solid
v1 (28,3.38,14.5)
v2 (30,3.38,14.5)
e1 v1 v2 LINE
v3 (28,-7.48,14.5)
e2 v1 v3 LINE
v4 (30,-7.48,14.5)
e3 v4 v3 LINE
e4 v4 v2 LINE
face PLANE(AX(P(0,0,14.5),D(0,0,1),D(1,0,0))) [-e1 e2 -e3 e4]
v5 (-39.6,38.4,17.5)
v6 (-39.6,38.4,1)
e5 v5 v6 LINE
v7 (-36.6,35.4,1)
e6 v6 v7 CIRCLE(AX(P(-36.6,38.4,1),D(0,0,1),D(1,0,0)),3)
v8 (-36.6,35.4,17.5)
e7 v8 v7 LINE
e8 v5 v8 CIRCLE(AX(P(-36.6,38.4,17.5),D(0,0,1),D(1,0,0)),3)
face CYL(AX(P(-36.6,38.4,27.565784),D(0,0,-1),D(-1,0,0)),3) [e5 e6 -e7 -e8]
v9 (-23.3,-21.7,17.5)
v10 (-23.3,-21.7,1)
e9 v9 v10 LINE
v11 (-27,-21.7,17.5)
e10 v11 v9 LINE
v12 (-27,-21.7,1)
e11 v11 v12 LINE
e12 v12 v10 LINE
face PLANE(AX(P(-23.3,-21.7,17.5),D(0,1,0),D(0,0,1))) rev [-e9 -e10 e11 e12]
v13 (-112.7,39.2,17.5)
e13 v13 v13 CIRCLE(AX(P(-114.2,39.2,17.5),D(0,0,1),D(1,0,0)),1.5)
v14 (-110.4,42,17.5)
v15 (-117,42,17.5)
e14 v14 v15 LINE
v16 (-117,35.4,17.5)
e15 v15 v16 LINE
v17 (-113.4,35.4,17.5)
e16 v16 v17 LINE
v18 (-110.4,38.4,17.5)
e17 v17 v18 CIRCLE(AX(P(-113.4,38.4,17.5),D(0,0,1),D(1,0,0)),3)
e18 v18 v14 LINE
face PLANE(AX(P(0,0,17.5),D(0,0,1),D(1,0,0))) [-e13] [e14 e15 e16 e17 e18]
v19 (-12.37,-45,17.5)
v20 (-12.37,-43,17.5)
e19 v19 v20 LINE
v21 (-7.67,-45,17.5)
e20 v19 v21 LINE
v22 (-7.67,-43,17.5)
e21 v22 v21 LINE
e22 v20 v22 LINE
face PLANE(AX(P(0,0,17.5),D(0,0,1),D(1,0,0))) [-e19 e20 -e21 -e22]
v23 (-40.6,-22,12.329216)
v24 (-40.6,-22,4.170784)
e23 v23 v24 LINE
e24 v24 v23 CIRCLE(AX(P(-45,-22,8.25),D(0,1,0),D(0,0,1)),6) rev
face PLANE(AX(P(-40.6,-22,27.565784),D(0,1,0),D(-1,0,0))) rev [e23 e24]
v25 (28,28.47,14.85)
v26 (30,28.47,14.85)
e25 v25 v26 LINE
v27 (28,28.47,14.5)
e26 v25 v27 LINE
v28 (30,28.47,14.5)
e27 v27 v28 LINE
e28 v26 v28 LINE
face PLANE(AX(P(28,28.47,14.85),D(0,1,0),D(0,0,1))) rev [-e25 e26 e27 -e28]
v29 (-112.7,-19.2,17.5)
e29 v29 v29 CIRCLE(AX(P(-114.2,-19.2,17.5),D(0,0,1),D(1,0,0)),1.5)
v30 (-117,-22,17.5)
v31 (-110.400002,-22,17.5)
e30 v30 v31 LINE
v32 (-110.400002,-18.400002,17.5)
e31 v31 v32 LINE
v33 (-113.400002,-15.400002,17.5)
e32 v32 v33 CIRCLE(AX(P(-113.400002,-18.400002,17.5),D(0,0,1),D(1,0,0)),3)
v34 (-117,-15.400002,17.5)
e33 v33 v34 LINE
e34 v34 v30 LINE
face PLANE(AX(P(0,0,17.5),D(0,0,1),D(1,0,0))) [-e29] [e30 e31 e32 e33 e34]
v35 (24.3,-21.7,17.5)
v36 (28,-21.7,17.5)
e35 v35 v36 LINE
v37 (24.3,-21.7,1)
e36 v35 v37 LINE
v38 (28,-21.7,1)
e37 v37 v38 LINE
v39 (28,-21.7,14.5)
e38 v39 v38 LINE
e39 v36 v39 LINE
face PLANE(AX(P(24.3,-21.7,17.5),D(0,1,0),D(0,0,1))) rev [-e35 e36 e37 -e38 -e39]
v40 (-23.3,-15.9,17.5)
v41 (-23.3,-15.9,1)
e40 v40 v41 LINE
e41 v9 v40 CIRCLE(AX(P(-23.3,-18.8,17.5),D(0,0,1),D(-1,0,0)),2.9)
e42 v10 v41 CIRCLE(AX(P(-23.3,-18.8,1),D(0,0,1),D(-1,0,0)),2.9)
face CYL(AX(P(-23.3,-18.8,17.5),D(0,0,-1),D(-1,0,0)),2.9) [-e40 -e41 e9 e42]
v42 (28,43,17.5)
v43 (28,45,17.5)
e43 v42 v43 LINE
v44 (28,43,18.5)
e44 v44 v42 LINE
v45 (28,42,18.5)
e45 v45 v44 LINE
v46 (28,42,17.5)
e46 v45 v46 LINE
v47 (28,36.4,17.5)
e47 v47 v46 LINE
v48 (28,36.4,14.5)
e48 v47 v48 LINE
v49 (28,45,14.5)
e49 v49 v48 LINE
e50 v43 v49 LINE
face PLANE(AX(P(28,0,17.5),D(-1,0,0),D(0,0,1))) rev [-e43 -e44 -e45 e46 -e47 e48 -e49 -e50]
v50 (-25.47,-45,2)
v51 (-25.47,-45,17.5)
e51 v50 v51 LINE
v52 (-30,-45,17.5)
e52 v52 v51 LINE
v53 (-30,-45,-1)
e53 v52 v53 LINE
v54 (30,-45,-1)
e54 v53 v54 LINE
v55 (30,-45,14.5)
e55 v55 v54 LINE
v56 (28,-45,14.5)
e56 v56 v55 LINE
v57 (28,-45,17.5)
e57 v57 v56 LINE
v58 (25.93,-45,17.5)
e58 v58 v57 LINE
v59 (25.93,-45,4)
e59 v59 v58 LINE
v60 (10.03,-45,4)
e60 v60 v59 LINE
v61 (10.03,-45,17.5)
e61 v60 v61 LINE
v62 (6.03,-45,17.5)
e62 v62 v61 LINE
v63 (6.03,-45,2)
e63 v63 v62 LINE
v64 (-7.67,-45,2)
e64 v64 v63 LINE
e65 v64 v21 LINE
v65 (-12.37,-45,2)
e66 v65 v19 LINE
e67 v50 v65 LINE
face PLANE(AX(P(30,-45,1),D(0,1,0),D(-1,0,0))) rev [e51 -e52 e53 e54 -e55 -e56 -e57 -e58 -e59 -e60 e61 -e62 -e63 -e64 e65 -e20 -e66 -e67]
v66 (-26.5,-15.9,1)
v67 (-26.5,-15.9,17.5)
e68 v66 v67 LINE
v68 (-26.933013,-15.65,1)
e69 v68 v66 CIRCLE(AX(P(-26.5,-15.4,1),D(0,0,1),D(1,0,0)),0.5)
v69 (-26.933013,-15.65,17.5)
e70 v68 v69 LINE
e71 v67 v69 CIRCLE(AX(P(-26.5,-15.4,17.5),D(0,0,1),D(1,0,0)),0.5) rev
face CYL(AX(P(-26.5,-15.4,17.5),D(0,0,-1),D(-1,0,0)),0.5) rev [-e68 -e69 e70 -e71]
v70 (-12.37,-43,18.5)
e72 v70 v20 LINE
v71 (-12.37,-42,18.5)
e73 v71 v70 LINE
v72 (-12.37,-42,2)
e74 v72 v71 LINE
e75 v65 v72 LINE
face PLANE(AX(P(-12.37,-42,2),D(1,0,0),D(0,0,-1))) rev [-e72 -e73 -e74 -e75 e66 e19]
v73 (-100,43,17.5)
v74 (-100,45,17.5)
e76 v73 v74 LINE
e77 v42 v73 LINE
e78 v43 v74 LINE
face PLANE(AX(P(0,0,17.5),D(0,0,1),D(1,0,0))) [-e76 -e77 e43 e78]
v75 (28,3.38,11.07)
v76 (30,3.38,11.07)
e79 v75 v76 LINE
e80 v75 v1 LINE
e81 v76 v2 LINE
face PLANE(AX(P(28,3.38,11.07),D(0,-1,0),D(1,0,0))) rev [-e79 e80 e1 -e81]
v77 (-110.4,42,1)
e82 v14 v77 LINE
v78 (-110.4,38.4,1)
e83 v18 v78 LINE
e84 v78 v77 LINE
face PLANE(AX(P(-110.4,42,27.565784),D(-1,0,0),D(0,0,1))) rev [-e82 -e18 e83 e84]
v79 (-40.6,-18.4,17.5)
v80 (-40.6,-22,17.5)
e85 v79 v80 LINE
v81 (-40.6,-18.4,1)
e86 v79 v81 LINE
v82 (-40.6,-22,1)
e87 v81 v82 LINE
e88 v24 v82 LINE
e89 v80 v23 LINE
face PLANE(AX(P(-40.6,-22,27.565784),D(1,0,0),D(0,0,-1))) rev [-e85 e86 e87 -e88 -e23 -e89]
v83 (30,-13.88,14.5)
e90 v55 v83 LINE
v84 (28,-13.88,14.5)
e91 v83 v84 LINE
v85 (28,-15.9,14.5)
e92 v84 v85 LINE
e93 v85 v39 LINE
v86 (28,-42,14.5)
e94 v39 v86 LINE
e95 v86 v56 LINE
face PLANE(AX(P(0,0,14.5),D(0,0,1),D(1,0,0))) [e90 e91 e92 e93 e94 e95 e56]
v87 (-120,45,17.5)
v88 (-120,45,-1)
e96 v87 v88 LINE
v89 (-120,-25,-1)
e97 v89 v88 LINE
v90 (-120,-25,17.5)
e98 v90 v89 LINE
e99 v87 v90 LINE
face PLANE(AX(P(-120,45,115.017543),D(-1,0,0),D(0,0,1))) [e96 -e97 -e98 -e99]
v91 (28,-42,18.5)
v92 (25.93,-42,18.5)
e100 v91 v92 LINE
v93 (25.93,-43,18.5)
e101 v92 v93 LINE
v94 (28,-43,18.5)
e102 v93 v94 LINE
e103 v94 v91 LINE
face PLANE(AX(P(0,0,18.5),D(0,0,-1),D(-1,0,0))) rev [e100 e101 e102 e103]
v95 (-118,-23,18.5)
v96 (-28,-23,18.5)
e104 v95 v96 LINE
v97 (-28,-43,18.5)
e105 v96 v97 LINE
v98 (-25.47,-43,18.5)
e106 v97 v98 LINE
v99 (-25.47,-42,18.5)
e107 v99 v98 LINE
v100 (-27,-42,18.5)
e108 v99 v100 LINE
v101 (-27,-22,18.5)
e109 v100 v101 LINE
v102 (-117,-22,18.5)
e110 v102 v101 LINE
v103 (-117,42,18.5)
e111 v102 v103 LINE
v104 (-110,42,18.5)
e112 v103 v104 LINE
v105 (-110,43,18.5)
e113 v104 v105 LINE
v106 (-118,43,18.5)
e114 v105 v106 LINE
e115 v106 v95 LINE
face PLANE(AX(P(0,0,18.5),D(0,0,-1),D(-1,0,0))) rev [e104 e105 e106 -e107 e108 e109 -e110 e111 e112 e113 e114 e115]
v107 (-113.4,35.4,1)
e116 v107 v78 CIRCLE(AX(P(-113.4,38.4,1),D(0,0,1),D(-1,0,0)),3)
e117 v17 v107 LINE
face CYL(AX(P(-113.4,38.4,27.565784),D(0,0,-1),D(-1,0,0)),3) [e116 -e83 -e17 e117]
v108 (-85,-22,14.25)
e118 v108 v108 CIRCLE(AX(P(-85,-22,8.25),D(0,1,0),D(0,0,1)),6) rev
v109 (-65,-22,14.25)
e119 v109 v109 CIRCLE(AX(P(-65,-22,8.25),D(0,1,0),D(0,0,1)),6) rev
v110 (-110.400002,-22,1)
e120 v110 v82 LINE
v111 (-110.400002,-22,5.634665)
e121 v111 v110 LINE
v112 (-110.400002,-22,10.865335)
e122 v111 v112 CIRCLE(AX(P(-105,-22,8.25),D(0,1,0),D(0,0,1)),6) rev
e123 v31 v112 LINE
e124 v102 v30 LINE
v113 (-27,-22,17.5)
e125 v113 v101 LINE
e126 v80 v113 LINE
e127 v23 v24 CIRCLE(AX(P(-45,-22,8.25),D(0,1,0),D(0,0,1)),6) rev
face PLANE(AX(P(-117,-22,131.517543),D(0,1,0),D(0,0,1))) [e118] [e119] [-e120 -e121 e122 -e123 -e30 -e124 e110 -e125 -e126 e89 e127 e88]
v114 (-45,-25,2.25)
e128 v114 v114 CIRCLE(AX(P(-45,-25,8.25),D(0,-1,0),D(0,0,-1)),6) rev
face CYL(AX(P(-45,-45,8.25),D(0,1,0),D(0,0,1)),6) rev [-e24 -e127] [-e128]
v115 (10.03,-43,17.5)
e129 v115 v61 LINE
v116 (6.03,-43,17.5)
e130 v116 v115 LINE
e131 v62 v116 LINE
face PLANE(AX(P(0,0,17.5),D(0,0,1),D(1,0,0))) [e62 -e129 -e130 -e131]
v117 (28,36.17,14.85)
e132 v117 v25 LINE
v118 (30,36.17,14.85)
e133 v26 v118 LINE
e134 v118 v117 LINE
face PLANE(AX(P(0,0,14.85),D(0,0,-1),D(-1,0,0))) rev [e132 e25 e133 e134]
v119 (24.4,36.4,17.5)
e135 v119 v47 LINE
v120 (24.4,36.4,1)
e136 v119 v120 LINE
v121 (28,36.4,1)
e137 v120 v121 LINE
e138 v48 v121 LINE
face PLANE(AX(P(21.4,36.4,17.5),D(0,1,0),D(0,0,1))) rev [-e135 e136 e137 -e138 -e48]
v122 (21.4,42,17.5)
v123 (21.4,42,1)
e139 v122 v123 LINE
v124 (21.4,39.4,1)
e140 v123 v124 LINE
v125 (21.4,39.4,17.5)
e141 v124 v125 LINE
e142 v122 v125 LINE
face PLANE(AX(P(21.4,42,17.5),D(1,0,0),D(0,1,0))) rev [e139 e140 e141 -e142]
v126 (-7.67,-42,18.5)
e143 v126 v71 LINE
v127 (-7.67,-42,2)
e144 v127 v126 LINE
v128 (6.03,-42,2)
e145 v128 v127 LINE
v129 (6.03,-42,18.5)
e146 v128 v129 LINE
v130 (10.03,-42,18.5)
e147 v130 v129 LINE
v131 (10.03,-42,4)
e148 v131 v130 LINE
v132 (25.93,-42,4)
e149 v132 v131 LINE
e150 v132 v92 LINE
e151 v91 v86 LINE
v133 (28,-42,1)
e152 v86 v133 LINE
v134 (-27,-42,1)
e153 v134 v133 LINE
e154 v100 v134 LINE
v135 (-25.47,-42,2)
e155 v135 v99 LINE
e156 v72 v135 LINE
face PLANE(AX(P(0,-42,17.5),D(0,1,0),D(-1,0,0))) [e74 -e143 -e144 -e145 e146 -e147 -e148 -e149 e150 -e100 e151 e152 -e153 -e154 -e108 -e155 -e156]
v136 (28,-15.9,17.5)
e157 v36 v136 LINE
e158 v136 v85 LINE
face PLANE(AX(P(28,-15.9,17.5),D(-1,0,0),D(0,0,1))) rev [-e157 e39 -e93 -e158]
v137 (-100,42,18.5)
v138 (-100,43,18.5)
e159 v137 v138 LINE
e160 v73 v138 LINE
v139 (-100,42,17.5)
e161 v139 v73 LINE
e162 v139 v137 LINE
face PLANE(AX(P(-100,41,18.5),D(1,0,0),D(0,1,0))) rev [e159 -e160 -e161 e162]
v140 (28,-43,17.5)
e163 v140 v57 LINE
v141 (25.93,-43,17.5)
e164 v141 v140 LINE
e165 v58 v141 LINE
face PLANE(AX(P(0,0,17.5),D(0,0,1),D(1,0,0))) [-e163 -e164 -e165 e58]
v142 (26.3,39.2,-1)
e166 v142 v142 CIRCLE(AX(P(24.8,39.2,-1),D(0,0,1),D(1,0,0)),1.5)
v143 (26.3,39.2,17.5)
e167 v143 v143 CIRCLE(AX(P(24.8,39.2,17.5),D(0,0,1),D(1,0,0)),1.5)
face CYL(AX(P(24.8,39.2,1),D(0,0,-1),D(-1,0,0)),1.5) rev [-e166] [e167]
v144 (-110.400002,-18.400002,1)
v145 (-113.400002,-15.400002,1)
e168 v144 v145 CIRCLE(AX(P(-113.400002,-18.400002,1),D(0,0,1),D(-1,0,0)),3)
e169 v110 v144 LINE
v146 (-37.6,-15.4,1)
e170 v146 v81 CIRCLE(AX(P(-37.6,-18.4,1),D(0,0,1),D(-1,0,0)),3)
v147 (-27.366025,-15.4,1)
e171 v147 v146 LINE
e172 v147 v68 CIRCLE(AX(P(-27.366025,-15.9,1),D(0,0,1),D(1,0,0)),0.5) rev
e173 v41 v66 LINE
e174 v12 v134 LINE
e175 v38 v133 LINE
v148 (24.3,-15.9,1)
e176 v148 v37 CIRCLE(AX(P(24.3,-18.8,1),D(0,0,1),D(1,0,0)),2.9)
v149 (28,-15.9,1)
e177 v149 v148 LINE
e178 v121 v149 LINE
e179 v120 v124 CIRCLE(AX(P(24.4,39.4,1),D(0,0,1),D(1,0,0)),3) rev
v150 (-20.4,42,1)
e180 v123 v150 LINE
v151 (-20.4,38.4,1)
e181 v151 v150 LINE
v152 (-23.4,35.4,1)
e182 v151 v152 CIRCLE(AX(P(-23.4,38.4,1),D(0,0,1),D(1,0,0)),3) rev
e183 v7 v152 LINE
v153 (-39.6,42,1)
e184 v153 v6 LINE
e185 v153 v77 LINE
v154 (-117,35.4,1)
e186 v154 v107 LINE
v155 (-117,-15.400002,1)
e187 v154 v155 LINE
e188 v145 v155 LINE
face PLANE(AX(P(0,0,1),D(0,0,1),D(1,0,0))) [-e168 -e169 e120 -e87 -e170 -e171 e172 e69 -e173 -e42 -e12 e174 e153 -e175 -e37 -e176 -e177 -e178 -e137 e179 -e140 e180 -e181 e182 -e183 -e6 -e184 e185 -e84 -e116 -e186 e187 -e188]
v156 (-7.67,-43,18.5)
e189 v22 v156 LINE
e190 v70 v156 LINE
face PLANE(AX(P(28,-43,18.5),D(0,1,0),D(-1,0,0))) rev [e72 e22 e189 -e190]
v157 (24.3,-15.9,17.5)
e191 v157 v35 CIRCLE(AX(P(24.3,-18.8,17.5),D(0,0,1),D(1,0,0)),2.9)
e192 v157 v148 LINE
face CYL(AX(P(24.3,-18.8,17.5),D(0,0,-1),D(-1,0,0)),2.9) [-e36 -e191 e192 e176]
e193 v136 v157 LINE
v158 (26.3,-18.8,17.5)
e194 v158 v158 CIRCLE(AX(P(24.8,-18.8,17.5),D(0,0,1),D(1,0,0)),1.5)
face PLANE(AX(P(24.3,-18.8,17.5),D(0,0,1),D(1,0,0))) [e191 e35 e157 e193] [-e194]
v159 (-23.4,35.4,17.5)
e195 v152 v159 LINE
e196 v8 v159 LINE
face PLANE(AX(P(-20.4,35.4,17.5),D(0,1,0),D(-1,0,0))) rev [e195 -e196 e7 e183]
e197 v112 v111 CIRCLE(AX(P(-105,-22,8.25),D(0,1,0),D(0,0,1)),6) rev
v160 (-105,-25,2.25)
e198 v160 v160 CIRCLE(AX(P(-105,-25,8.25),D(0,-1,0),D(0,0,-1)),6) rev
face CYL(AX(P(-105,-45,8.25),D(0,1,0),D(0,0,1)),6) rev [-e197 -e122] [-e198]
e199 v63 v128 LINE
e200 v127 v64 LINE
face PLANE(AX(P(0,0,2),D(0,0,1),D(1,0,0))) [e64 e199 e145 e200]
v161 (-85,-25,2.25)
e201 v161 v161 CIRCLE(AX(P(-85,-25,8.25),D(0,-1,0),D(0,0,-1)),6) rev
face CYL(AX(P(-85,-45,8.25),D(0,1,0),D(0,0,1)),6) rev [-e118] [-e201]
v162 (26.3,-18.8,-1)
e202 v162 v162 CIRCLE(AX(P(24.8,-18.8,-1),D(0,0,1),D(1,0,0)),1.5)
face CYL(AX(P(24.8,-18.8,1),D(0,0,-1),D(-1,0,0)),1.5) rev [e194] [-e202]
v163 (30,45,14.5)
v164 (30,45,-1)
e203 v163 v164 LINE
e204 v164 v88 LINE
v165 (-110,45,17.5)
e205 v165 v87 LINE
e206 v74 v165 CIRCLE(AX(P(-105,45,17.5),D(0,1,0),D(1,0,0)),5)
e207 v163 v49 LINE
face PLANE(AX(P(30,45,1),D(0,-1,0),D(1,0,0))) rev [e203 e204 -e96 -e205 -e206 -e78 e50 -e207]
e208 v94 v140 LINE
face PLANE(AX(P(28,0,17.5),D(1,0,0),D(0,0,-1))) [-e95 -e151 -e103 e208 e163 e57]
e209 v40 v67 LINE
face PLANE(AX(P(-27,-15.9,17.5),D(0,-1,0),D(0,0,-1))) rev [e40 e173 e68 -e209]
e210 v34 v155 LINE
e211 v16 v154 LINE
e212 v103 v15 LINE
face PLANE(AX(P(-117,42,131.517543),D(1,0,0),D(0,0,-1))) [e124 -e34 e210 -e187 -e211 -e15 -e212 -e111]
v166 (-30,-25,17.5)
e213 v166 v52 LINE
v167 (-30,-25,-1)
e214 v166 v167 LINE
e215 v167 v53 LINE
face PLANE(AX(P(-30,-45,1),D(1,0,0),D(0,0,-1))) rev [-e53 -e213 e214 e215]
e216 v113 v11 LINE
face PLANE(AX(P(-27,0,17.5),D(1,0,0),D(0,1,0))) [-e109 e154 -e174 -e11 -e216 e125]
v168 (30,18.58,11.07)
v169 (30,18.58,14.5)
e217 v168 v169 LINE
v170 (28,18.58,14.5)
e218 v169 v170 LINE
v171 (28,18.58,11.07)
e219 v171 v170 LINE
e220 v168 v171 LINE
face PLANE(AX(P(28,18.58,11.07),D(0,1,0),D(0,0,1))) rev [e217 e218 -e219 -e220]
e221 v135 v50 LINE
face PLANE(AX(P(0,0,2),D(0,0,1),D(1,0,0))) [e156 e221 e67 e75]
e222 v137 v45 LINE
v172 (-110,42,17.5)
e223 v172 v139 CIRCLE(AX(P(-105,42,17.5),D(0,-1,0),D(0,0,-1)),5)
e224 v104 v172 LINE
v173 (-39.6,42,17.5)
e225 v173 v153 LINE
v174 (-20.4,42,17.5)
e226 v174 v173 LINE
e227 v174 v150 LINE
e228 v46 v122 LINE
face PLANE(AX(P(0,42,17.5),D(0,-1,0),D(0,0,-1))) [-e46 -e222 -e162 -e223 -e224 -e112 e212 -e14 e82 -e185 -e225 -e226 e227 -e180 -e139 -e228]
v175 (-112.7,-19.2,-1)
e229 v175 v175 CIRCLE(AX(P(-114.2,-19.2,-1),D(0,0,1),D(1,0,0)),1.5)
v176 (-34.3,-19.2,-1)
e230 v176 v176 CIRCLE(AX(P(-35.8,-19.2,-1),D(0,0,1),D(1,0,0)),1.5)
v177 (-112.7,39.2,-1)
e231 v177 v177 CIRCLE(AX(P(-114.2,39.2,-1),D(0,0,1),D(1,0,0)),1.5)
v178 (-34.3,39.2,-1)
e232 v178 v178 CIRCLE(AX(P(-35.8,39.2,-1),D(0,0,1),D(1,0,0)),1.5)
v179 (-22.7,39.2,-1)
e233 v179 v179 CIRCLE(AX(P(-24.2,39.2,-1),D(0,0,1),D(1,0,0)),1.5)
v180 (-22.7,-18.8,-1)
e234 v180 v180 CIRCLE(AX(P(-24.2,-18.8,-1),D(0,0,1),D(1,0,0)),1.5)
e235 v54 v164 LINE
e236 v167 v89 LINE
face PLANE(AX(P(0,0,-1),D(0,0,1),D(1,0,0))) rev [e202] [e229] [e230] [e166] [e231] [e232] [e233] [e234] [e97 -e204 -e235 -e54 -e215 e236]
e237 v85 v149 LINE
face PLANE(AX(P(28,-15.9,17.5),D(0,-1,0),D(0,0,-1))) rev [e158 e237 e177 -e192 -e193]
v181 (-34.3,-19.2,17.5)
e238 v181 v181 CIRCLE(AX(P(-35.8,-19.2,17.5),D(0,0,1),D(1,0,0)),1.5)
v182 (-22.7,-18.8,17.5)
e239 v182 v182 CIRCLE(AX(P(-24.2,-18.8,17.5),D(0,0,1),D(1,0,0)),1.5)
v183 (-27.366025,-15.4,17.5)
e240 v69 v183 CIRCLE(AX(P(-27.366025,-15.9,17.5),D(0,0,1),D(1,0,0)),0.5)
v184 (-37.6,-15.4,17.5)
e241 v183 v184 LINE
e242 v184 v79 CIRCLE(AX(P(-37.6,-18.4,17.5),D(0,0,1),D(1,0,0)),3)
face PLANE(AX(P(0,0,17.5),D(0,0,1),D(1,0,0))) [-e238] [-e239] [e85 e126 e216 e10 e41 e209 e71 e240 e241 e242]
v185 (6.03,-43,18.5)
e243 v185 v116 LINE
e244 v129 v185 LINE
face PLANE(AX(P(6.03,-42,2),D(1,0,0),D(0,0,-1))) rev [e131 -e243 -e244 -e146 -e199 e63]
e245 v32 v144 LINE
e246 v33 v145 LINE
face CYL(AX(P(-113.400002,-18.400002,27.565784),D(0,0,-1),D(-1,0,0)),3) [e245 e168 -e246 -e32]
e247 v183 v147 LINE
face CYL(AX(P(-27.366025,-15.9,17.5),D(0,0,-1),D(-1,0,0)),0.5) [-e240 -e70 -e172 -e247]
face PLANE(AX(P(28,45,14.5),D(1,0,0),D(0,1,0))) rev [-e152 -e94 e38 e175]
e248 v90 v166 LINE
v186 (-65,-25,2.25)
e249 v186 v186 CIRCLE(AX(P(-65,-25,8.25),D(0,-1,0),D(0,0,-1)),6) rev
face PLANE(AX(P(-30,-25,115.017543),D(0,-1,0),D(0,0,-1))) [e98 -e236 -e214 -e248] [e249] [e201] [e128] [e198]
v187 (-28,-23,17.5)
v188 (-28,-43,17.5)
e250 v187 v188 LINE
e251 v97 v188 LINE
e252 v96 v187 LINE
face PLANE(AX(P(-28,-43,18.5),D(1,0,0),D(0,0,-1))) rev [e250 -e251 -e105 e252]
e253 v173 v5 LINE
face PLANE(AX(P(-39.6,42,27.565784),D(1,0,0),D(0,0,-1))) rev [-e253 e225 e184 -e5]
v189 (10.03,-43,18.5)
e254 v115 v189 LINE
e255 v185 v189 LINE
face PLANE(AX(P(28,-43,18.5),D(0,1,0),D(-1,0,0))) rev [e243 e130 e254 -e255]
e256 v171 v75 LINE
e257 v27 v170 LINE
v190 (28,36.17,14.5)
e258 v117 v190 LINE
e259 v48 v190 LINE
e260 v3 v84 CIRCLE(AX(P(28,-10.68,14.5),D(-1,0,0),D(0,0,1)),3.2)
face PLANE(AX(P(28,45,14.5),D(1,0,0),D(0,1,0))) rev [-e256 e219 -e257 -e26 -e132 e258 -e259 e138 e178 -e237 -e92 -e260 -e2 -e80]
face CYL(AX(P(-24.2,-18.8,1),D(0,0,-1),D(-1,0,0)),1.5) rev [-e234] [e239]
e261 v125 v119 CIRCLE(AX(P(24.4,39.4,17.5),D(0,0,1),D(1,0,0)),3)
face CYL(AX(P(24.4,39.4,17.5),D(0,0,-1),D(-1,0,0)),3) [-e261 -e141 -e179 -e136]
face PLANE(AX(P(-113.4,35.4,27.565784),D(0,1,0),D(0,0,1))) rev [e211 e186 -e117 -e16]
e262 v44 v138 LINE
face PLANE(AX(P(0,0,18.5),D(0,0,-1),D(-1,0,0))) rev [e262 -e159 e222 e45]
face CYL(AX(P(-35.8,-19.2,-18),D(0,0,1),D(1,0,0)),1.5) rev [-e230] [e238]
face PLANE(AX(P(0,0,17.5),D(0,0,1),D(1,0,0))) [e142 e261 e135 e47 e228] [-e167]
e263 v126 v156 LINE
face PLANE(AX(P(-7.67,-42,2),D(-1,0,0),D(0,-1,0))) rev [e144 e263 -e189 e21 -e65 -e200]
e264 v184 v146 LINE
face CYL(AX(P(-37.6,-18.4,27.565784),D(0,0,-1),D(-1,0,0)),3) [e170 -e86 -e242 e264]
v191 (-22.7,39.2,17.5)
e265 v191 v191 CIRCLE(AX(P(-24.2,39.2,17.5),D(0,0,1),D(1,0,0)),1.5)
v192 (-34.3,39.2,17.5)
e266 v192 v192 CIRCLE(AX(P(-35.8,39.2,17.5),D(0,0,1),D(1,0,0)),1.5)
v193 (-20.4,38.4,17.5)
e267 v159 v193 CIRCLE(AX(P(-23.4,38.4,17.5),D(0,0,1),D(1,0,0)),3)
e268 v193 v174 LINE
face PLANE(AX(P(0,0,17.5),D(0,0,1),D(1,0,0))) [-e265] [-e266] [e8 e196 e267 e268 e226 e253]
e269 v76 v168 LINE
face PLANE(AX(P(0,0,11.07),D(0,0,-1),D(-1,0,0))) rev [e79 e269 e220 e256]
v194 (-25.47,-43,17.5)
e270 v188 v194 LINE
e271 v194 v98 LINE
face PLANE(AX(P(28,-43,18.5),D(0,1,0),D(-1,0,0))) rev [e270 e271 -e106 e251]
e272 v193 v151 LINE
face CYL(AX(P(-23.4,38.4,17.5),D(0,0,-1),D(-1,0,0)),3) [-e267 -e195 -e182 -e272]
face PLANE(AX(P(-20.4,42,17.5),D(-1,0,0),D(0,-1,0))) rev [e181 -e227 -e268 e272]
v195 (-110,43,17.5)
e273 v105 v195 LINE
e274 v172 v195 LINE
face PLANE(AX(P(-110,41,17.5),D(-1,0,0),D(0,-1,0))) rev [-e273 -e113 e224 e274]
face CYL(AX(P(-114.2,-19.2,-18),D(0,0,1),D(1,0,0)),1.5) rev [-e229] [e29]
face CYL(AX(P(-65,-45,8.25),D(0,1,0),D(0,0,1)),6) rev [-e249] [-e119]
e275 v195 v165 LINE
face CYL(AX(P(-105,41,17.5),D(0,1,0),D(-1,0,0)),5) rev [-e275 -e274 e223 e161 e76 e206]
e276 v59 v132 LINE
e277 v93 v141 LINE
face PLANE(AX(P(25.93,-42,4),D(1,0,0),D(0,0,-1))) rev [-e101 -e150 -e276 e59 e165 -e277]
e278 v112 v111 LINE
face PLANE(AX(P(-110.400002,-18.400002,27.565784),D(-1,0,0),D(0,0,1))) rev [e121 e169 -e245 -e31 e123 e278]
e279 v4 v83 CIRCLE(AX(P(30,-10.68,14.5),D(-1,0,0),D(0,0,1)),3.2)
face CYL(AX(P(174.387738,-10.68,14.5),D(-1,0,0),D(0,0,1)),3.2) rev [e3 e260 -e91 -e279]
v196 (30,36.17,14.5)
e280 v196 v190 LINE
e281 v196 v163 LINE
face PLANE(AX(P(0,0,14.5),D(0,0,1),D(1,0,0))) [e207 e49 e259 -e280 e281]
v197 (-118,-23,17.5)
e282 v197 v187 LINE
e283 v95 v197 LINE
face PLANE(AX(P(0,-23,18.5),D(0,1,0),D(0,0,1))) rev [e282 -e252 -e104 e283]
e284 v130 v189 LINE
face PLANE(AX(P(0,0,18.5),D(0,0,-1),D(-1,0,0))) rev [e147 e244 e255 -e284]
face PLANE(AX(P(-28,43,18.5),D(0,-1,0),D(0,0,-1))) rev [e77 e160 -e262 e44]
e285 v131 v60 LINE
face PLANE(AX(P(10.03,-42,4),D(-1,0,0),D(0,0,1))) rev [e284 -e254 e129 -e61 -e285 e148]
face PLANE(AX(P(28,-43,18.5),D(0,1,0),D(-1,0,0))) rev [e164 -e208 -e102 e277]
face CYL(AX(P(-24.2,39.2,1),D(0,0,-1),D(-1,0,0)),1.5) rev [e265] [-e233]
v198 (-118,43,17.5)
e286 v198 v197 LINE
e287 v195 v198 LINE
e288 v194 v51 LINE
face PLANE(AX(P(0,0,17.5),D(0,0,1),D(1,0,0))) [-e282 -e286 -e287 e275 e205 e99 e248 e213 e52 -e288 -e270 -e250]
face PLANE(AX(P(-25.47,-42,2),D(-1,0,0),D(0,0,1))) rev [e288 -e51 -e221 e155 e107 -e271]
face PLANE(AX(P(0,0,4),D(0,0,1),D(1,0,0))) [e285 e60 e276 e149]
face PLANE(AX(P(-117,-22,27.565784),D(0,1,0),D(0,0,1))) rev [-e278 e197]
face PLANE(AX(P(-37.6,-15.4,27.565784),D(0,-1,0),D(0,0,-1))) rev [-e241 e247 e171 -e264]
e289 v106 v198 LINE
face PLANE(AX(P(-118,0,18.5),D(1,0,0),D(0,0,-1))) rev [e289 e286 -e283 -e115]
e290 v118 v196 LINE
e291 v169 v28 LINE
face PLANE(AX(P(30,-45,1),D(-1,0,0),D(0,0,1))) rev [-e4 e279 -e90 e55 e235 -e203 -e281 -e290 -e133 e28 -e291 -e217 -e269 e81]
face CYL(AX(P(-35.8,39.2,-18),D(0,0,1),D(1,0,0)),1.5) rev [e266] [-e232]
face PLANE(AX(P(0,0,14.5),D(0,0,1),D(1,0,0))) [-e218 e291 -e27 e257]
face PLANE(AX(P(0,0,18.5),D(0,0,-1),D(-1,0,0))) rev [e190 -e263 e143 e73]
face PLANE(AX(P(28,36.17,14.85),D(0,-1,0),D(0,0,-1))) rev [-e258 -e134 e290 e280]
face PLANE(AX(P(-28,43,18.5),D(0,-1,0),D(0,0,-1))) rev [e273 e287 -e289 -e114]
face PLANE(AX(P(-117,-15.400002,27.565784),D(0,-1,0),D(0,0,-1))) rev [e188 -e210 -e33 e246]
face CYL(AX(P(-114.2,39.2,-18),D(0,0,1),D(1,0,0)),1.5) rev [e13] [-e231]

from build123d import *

# Parameters (mm, degrees)
SKETCH1_W                      = 60
SKETCH1_H                      = 90
SKETCH1_R                      = 1.5
BOSS_EXTRUDE1_DEPTH            = 1
BOSS_EXTRUDE2_DEPTH            = 16.5
SKETCH3_W                      = 2
SKETCH3_H                      = 90
BOSS_EXTRUDE3_DEPTH            = 13.5
BOSS_EXTRUDE4_DEPTH            = 1
SKETCH5_W                      = 13.1
SKETCH5_H                      = 3
SKETCH5_W_2                    = 13.7
CUT_EXTRUDE1_DEPTH             = 16.5
SKETCH6_W                      = 15.9
SKETCH6_H                      = 3
CUT_EXTRUDE2_DEPTH             = 14.5
SKETCH7_R                      = 1.5
SKETCH7_W                      = 6.6
SKETCH7_H                      = 6.6
SKETCH7_H_2                    = 5.6
BOSS_EXTRUDE5_DEPTH            = 16.5
FILLET3_R                      = 3
CUT_EXTRUDE3_DEPTH             = 78.24797732
CUT_EXTRUDE3_DEPTH_BACK        = 2
SKETCH10_W                     = 2
SKETCH10_H                     = 15.2
CUT_EXTRUDE4_DEPTH             = 3.43
SKETCH11_W                     = 2
SKETCH11_H                     = 7.7
BOSS_EXTRUDE6_DEPTH            = 0.35
SKETCH13_W                     = 90
SKETCH13_H                     = 70
BOSS_EXTRUDE7_DEPTH            = 2
SKETCH14_W                     = 90
SKETCH14_H                     = 70
SKETCH14_W_2                   = 84
SKETCH14_H_2                   = 64
BOSS_EXTRUDE8_DEPTH            = 16.5
SKETCH15_W                     = 86
SKETCH15_H                     = 66
SKETCH15_W_2                   = 84
SKETCH15_H_2                   = 64
SKETCH15_W_3                   = 4
SKETCH15_H_3                   = 1
BOSS_EXTRUDE9_DEPTH            = 1
SKETCH16_W                     = 6
SKETCH16_H                     = 64
CUT_EXTRUDE6_DEPTH             = 1
CUT_EXTRUDE7_REACH             = 142.151
SKETCH17_R                     = 6
CUT_EXTRUDE7_DIRECTION_2_DEPTH = 141.150811628
BOSS_EXTRUDE10_DEPTH           = 16.5
CUT_EXTRUDE8_DEPTH             = 56
CUT_EXTRUDE8_DEPTH_BACK        = 19
SKETCH18_R                     = 1.5
SKETCH20_W                     = 6
SKETCH20_H                     = 50.8
CUT_EXTRUDE9_DEPTH             = 16.5
FILLET4_R                      = 0.5
FILLET5_R                      = 0.5
CUT_EXTRUDE10_DEPTH            = 4


with BuildPart() as part:
    # Sketch1 → Boss-Extrude1 (new, symmetric)
    with BuildSketch(Plane.XY):
        Rectangle(SKETCH1_W, SKETCH1_H)
        with Locations((-24.2, -18.8)):
            Circle(SKETCH1_R, mode=Mode.SUBTRACT)
        with Locations((-24.2, 39.2)):
            Circle(SKETCH1_R, mode=Mode.SUBTRACT)
        with Locations((24.8, 39.2)):
            Circle(SKETCH1_R, mode=Mode.SUBTRACT)
        with Locations((24.8, -18.8)):
            Circle(SKETCH1_R, mode=Mode.SUBTRACT)
    extrude(amount=BOSS_EXTRUDE1_DEPTH, both=True)

    # Sketch2 → Boss-Extrude2 (add)
    with BuildSketch(Plane.XY.offset(1)):
        Polygon((-27, 42), (28, 42), (28, 45), (-30, 45), (-30, -45), (28, -45), (28, -42), (-27, -42), align=None)
    extrude(amount=BOSS_EXTRUDE2_DEPTH)

    # Sketch3 → Boss-Extrude3 (add)
    with BuildSketch(Plane.XY.offset(1)):
        with Locations((29, 0)):
            Rectangle(SKETCH3_W, SKETCH3_H)
    extrude(amount=BOSS_EXTRUDE3_DEPTH)

    # Sketch4 → Boss-Extrude4 (add)
    with BuildSketch(Plane.XY.offset(17.5)):
        Polygon((28, -43), (-28, -43), (-28, 43), (28, 43), (28, 42), (-27, 42), (-27, -42), (28, -42), align=None)
    extrude(amount=BOSS_EXTRUDE4_DEPTH)

    # Sketch5 → Cut-Extrude1 (cut)
    with BuildSketch(Plane.XY.offset(18.5)):
        with Locations((-18.92, -43.5)):
            Rectangle(SKETCH5_W, SKETCH5_H)
        with Locations((-0.82, -43.5)):
            Rectangle(SKETCH5_W_2, SKETCH5_H)
    extrude(amount=-CUT_EXTRUDE1_DEPTH, mode=Mode.SUBTRACT)

    # Sketch6 → Cut-Extrude2 (cut)
    with BuildSketch(Plane.XY.offset(18.5)):
        with Locations((17.98, -43.5)):
            Rectangle(SKETCH6_W, SKETCH6_H)
    extrude(amount=-CUT_EXTRUDE2_DEPTH, mode=Mode.SUBTRACT)

    # Sketch7 → Boss-Extrude5 (add)
    # profile 1 of 4: a face of its own
    with BuildSketch(Plane.XY.offset(1)):
        with BuildLine():
            Line((-27, -15.9), (-23.3, -15.9))
            ThreePointArc((-23.3, -15.9), (-20.4, -18.8), (-23.3, -21.7))
            Line((-23.3, -21.7), (-27, -21.7))
            Line((-27, -21.7), (-27, -15.9))
        make_face()
        with Locations((-24.2, -18.8)):
            Circle(SKETCH7_R, mode=Mode.SUBTRACT)
    # profile 2 of 4: a face of its own
    with BuildSketch(Plane.XY.offset(1)):
        with Locations((-23.7, 38.7)):
            Rectangle(SKETCH7_W, SKETCH7_H)
        with Locations((-24.2, 39.2)):
            Circle(SKETCH7_R, mode=Mode.SUBTRACT)
    # profile 3 of 4: a face of its own
    with BuildSketch(Plane.XY.offset(1)):
        with BuildLine():
            Line((24.3, -21.7), (28, -21.7))
            Line((28, -21.7), (28, -15.9))
            Line((28, -15.9), (24.3, -15.9))
            ThreePointArc((24.3, -15.9), (21.4, -18.8), (24.3, -21.7))
        make_face()
        with Locations((24.8, -18.8)):
            Circle(SKETCH7_R, mode=Mode.SUBTRACT)
    # profile 4 of 4: a face of its own
    with BuildSketch(Plane.XY.offset(1)):
        with Locations((24.7, 39.2)):
            Rectangle(SKETCH7_W, SKETCH7_H_2)
        with Locations((24.8, 39.2)):
            Circle(SKETCH7_R, mode=Mode.SUBTRACT)
    extrude(amount=BOSS_EXTRUDE5_DEPTH)

    # Fillet3
    fillet3_edges = [part.edges().sort_by_distance(p)[0] for p in [
        (-20.4, 35.4, 9.25),
        (21.4, 36.4, 9.25),
    ]]
    fillet(fillet3_edges, radius=FILLET3_R)

    # Sketch9 → Cut-Extrude3 (cut, two sides: drawn at the far end of the back side and taken through both)
    with BuildSketch(Plane(origin=(30, 0, 0), x_dir=(0, 0, -1), z_dir=(1, 0, 0)).offset(-CUT_EXTRUDE3_DEPTH_BACK)):
        with BuildLine():
            Line((-146.271990211, -13.88), (-14.5, -13.88))
            ThreePointArc((-14.5, -13.88), (-11.3, -10.68), (-14.5, -7.48))
            Line((-14.5, -7.48), (-146.271990211, -7.48))
            Line((-146.271990211, -7.48), (-409.815970634, -7.48))
            Line((-409.815970634, -7.48), (-409.815970634, -13.88))
            Line((-409.815970634, -13.88), (-146.271990211, -13.88))
        make_face()
    extrude(amount=CUT_EXTRUDE3_DEPTH + CUT_EXTRUDE3_DEPTH_BACK, mode=Mode.SUBTRACT)

    # Sketch10 → Cut-Extrude4 (cut)
    with BuildSketch(Plane.XY.offset(14.5)):
        with Locations((29, 10.98)):
            Rectangle(SKETCH10_W, SKETCH10_H)
    extrude(amount=-CUT_EXTRUDE4_DEPTH, mode=Mode.SUBTRACT)

    # Sketch11 → Boss-Extrude6 (add)
    with BuildSketch(Plane.XY.offset(14.5)):
        with Locations((29, 32.32)):
            Rectangle(SKETCH11_W, SKETCH11_H)
    extrude(amount=BOSS_EXTRUDE6_DEPTH)

    # Sketch13 → Boss-Extrude7 (add)
    with BuildSketch(Plane(origin=(0, 0, -1), x_dir=(-1, 0, 0), z_dir=(0, 0, -1))):
        with Locations((75, 10)):
            Rectangle(SKETCH13_W, SKETCH13_H)
    extrude(amount=-BOSS_EXTRUDE7_DEPTH)

    # Sketch14 → Boss-Extrude8 (add)
    with BuildSketch(Plane.XY.offset(1)):
        with Locations((-75, 10)):
            Rectangle(SKETCH14_W, SKETCH14_H)
        with Locations((-75, 10)):
            Rectangle(SKETCH14_W_2, SKETCH14_H_2, mode=Mode.SUBTRACT)
    extrude(amount=BOSS_EXTRUDE8_DEPTH)

    # Sketch15 → Boss-Extrude9 (add)
    # profile 1 of 3: a face of its own
    with BuildSketch(Plane.XY.offset(17.5)):
        with Locations((-75, 10)):
            Rectangle(SKETCH15_W, SKETCH15_H)
        with Locations((-75, 10)):
            Rectangle(SKETCH15_W_2, SKETCH15_H_2, mode=Mode.SUBTRACT)
    # profile 2 of 3: a face of its own
    with BuildSketch(Plane.XY.offset(17.5)):
        with Locations((-30, -22.5)):
            Rectangle(SKETCH15_W_3, SKETCH15_H_3)
    # profile 3 of 3: a face of its own
    with BuildSketch(Plane.XY.offset(17.5)):
        with Locations((-30, 42.5)):
            Rectangle(SKETCH15_W_3, SKETCH15_H_3)
    extrude(amount=BOSS_EXTRUDE9_DEPTH)

    # Sketch16 → Cut-Extrude6 (cut)
    with BuildSketch(Plane.XY.offset(18.5)):
        with Locations((-30, 10)):
            Rectangle(SKETCH16_W, SKETCH16_H)
    extrude(amount=-CUT_EXTRUDE6_DEPTH, mode=Mode.SUBTRACT)

    # Sketch17 → Cut-Extrude7 (cut, up to next)
    with BuildSketch(Plane.XZ.offset(25), mode=Mode.PRIVATE) as cut_extrude7_sk1:
        with Locations(Location((-45, 8.25, 0), (0, 0, 90))):
            Circle(SKETCH17_R)
    cut_extrude7_tool1 = extrude(cut_extrude7_sk1.sketch, amount=-CUT_EXTRUDE7_REACH, mode=Mode.PRIVATE) & part.part
    # Sketch17 → Cut-Extrude7 (cut, up to next)
    with BuildSketch(Plane.XZ.offset(25), mode=Mode.PRIVATE) as cut_extrude7_sk2:
        with Locations(Location((-65, 8.25, 0), (0, 0, 90))):
            Circle(SKETCH17_R)
    cut_extrude7_tool2 = extrude(cut_extrude7_sk2.sketch, amount=-CUT_EXTRUDE7_REACH, mode=Mode.PRIVATE) & part.part
    # Sketch17 → Cut-Extrude7 (cut, up to next)
    with BuildSketch(Plane.XZ.offset(25), mode=Mode.PRIVATE) as cut_extrude7_sk3:
        with Locations(Location((-85, 8.25, 0), (0, 0, 90))):
            Circle(SKETCH17_R)
    cut_extrude7_tool3 = extrude(cut_extrude7_sk3.sketch, amount=-CUT_EXTRUDE7_REACH, mode=Mode.PRIVATE) & part.part
    # Sketch17 → Cut-Extrude7 (cut, up to next)
    with BuildSketch(Plane.XZ.offset(25), mode=Mode.PRIVATE) as cut_extrude7_sk4:
        with Locations(Location((-105, 8.25, 0), (0, 0, 90))):
            Circle(SKETCH17_R)
    cut_extrude7_tool4 = extrude(cut_extrude7_sk4.sketch, amount=-CUT_EXTRUDE7_REACH, mode=Mode.PRIVATE) & part.part
    add(cut_extrude7_tool1.solids().sort_by_distance((-45, -25, 8.25))[0], mode=Mode.SUBTRACT)
    add(cut_extrude7_tool2.solids().sort_by_distance((-65, -25, 8.25))[0], mode=Mode.SUBTRACT)
    add(cut_extrude7_tool3.solids().sort_by_distance((-85, -25, 8.25))[0], mode=Mode.SUBTRACT)
    add(cut_extrude7_tool4.solids().sort_by_distance((-105, -25, 8.25))[0], mode=Mode.SUBTRACT)

    # Sketch17 → Cut-Extrude7 direction 2 (cut)
    with BuildSketch(Plane.XZ.offset(25)):
        with Locations(Location((-45, 8.25, 0), (0, 0, 90))):
            Circle(SKETCH17_R)
        with Locations(Location((-65, 8.25, 0), (0, 0, 90))):
            Circle(SKETCH17_R)
        with Locations(Location((-85, 8.25, 0), (0, 0, 90))):
            Circle(SKETCH17_R)
        with Locations(Location((-105, 8.25, 0), (0, 0, 90))):
            Circle(SKETCH17_R)
    extrude(amount=CUT_EXTRUDE7_DIRECTION_2_DEPTH, mode=Mode.SUBTRACT)

    # Sketch19 → Boss-Extrude10 (add)
    with BuildSketch(Plane.XY.offset(1)):
        with BuildLine():
            Line((-117, -15.400002114), (-113.400002114, -15.400002114))
            ThreePointArc((-113.400002114, -15.400002114), (-111.27868177, -16.27868177), (-110.400002114, -18.400002114))
            Line((-110.400002114, -18.400002114), (-110.400002114, -22))
            Line((-110.400002114, -22), (-117, -22))
            Line((-117, -22), (-117, -15.400002114))
        make_face()
        with BuildLine():
            Line((-40.6, -22), (-40.6, -18.4))
            ThreePointArc((-40.6, -18.4), (-39.721320344, -16.278679656), (-37.6, -15.4))
            Line((-37.6, -15.4), (-33, -15.4))
            Line((-33, -15.4), (-33, -22))
            Line((-33, -22), (-40.6, -22))
        make_face()
        with BuildLine():
            Line((-39.6, 42), (-39.6, 38.4))
            ThreePointArc((-39.6, 38.4), (-38.721320344, 36.278679656), (-36.6, 35.4))
            Line((-36.6, 35.4), (-33, 35.4))
            Line((-33, 35.4), (-33, 42))
            Line((-33, 42), (-39.6, 42))
        make_face()
        with BuildLine():
            Line((-110.4, 42), (-110.4, 38.4))
            ThreePointArc((-110.4, 38.4), (-111.278679656, 36.278679656), (-113.4, 35.4))
            Line((-113.4, 35.4), (-117, 35.4))
            Line((-117, 35.4), (-117, 42))
            Line((-117, 42), (-110.4, 42))
        make_face()
    extrude(amount=BOSS_EXTRUDE10_DEPTH)

    # Sketch18 → Cut-Extrude8 (cut, two sides: drawn at the far end of the back side and taken through both)
    with BuildSketch(Plane.XY.offset(1).offset(-CUT_EXTRUDE8_DEPTH_BACK)):
        with Locations((-114.2, 39.2)):
            Circle(SKETCH18_R)
        with Locations((-35.8, 39.2)):
            Circle(SKETCH18_R)
        with Locations((-35.8, -19.2)):
            Circle(SKETCH18_R)
        with Locations((-114.2, -19.2)):
            Circle(SKETCH18_R)
    extrude(amount=CUT_EXTRUDE8_DEPTH + CUT_EXTRUDE8_DEPTH_BACK, mode=Mode.SUBTRACT)

    # Sketch20 → Cut-Extrude9 (cut)
    with BuildSketch(Plane.XY.offset(17.5)):
        with Locations((-30, 10)):
            Rectangle(SKETCH20_W, SKETCH20_H)
    extrude(amount=-CUT_EXTRUDE9_DEPTH, mode=Mode.SUBTRACT)

    # Fillet4
    fillet4_edges = [part.edges().sort_by_distance(p)[0] for p in [
        (-27, -15.9, 9.25),
    ]]
    fillet(fillet4_edges, radius=FILLET4_R - 0.0001)  # a hair under: the kernel refuses the full size

    # Fillet5
    fillet5_edges = [part.edges().sort_by_distance(p)[0] for p in [
        (-27, -15.4, 9.25),
    ]]
    fillet(fillet5_edges, radius=FILLET5_R)

    # Sketch21 → Cut-Extrude10 (cut)
    with BuildSketch(Plane(origin=(0, 45, 0), x_dir=(1, 0, 0), z_dir=(0, 1, 0))):
        with BuildLine():
            Line((-110, -17.5), (-110, -18.5))
            Line((-110, -18.5), (-100, -18.5))
            Line((-100, -18.5), (-100, -17.5))
            ThreePointArc((-100, -17.5), (-105, -12.5), (-110, -17.5))
        make_face()
    extrude(amount=-CUT_EXTRUDE10_DEPTH, mode=Mode.SUBTRACT)


solid = part.part
